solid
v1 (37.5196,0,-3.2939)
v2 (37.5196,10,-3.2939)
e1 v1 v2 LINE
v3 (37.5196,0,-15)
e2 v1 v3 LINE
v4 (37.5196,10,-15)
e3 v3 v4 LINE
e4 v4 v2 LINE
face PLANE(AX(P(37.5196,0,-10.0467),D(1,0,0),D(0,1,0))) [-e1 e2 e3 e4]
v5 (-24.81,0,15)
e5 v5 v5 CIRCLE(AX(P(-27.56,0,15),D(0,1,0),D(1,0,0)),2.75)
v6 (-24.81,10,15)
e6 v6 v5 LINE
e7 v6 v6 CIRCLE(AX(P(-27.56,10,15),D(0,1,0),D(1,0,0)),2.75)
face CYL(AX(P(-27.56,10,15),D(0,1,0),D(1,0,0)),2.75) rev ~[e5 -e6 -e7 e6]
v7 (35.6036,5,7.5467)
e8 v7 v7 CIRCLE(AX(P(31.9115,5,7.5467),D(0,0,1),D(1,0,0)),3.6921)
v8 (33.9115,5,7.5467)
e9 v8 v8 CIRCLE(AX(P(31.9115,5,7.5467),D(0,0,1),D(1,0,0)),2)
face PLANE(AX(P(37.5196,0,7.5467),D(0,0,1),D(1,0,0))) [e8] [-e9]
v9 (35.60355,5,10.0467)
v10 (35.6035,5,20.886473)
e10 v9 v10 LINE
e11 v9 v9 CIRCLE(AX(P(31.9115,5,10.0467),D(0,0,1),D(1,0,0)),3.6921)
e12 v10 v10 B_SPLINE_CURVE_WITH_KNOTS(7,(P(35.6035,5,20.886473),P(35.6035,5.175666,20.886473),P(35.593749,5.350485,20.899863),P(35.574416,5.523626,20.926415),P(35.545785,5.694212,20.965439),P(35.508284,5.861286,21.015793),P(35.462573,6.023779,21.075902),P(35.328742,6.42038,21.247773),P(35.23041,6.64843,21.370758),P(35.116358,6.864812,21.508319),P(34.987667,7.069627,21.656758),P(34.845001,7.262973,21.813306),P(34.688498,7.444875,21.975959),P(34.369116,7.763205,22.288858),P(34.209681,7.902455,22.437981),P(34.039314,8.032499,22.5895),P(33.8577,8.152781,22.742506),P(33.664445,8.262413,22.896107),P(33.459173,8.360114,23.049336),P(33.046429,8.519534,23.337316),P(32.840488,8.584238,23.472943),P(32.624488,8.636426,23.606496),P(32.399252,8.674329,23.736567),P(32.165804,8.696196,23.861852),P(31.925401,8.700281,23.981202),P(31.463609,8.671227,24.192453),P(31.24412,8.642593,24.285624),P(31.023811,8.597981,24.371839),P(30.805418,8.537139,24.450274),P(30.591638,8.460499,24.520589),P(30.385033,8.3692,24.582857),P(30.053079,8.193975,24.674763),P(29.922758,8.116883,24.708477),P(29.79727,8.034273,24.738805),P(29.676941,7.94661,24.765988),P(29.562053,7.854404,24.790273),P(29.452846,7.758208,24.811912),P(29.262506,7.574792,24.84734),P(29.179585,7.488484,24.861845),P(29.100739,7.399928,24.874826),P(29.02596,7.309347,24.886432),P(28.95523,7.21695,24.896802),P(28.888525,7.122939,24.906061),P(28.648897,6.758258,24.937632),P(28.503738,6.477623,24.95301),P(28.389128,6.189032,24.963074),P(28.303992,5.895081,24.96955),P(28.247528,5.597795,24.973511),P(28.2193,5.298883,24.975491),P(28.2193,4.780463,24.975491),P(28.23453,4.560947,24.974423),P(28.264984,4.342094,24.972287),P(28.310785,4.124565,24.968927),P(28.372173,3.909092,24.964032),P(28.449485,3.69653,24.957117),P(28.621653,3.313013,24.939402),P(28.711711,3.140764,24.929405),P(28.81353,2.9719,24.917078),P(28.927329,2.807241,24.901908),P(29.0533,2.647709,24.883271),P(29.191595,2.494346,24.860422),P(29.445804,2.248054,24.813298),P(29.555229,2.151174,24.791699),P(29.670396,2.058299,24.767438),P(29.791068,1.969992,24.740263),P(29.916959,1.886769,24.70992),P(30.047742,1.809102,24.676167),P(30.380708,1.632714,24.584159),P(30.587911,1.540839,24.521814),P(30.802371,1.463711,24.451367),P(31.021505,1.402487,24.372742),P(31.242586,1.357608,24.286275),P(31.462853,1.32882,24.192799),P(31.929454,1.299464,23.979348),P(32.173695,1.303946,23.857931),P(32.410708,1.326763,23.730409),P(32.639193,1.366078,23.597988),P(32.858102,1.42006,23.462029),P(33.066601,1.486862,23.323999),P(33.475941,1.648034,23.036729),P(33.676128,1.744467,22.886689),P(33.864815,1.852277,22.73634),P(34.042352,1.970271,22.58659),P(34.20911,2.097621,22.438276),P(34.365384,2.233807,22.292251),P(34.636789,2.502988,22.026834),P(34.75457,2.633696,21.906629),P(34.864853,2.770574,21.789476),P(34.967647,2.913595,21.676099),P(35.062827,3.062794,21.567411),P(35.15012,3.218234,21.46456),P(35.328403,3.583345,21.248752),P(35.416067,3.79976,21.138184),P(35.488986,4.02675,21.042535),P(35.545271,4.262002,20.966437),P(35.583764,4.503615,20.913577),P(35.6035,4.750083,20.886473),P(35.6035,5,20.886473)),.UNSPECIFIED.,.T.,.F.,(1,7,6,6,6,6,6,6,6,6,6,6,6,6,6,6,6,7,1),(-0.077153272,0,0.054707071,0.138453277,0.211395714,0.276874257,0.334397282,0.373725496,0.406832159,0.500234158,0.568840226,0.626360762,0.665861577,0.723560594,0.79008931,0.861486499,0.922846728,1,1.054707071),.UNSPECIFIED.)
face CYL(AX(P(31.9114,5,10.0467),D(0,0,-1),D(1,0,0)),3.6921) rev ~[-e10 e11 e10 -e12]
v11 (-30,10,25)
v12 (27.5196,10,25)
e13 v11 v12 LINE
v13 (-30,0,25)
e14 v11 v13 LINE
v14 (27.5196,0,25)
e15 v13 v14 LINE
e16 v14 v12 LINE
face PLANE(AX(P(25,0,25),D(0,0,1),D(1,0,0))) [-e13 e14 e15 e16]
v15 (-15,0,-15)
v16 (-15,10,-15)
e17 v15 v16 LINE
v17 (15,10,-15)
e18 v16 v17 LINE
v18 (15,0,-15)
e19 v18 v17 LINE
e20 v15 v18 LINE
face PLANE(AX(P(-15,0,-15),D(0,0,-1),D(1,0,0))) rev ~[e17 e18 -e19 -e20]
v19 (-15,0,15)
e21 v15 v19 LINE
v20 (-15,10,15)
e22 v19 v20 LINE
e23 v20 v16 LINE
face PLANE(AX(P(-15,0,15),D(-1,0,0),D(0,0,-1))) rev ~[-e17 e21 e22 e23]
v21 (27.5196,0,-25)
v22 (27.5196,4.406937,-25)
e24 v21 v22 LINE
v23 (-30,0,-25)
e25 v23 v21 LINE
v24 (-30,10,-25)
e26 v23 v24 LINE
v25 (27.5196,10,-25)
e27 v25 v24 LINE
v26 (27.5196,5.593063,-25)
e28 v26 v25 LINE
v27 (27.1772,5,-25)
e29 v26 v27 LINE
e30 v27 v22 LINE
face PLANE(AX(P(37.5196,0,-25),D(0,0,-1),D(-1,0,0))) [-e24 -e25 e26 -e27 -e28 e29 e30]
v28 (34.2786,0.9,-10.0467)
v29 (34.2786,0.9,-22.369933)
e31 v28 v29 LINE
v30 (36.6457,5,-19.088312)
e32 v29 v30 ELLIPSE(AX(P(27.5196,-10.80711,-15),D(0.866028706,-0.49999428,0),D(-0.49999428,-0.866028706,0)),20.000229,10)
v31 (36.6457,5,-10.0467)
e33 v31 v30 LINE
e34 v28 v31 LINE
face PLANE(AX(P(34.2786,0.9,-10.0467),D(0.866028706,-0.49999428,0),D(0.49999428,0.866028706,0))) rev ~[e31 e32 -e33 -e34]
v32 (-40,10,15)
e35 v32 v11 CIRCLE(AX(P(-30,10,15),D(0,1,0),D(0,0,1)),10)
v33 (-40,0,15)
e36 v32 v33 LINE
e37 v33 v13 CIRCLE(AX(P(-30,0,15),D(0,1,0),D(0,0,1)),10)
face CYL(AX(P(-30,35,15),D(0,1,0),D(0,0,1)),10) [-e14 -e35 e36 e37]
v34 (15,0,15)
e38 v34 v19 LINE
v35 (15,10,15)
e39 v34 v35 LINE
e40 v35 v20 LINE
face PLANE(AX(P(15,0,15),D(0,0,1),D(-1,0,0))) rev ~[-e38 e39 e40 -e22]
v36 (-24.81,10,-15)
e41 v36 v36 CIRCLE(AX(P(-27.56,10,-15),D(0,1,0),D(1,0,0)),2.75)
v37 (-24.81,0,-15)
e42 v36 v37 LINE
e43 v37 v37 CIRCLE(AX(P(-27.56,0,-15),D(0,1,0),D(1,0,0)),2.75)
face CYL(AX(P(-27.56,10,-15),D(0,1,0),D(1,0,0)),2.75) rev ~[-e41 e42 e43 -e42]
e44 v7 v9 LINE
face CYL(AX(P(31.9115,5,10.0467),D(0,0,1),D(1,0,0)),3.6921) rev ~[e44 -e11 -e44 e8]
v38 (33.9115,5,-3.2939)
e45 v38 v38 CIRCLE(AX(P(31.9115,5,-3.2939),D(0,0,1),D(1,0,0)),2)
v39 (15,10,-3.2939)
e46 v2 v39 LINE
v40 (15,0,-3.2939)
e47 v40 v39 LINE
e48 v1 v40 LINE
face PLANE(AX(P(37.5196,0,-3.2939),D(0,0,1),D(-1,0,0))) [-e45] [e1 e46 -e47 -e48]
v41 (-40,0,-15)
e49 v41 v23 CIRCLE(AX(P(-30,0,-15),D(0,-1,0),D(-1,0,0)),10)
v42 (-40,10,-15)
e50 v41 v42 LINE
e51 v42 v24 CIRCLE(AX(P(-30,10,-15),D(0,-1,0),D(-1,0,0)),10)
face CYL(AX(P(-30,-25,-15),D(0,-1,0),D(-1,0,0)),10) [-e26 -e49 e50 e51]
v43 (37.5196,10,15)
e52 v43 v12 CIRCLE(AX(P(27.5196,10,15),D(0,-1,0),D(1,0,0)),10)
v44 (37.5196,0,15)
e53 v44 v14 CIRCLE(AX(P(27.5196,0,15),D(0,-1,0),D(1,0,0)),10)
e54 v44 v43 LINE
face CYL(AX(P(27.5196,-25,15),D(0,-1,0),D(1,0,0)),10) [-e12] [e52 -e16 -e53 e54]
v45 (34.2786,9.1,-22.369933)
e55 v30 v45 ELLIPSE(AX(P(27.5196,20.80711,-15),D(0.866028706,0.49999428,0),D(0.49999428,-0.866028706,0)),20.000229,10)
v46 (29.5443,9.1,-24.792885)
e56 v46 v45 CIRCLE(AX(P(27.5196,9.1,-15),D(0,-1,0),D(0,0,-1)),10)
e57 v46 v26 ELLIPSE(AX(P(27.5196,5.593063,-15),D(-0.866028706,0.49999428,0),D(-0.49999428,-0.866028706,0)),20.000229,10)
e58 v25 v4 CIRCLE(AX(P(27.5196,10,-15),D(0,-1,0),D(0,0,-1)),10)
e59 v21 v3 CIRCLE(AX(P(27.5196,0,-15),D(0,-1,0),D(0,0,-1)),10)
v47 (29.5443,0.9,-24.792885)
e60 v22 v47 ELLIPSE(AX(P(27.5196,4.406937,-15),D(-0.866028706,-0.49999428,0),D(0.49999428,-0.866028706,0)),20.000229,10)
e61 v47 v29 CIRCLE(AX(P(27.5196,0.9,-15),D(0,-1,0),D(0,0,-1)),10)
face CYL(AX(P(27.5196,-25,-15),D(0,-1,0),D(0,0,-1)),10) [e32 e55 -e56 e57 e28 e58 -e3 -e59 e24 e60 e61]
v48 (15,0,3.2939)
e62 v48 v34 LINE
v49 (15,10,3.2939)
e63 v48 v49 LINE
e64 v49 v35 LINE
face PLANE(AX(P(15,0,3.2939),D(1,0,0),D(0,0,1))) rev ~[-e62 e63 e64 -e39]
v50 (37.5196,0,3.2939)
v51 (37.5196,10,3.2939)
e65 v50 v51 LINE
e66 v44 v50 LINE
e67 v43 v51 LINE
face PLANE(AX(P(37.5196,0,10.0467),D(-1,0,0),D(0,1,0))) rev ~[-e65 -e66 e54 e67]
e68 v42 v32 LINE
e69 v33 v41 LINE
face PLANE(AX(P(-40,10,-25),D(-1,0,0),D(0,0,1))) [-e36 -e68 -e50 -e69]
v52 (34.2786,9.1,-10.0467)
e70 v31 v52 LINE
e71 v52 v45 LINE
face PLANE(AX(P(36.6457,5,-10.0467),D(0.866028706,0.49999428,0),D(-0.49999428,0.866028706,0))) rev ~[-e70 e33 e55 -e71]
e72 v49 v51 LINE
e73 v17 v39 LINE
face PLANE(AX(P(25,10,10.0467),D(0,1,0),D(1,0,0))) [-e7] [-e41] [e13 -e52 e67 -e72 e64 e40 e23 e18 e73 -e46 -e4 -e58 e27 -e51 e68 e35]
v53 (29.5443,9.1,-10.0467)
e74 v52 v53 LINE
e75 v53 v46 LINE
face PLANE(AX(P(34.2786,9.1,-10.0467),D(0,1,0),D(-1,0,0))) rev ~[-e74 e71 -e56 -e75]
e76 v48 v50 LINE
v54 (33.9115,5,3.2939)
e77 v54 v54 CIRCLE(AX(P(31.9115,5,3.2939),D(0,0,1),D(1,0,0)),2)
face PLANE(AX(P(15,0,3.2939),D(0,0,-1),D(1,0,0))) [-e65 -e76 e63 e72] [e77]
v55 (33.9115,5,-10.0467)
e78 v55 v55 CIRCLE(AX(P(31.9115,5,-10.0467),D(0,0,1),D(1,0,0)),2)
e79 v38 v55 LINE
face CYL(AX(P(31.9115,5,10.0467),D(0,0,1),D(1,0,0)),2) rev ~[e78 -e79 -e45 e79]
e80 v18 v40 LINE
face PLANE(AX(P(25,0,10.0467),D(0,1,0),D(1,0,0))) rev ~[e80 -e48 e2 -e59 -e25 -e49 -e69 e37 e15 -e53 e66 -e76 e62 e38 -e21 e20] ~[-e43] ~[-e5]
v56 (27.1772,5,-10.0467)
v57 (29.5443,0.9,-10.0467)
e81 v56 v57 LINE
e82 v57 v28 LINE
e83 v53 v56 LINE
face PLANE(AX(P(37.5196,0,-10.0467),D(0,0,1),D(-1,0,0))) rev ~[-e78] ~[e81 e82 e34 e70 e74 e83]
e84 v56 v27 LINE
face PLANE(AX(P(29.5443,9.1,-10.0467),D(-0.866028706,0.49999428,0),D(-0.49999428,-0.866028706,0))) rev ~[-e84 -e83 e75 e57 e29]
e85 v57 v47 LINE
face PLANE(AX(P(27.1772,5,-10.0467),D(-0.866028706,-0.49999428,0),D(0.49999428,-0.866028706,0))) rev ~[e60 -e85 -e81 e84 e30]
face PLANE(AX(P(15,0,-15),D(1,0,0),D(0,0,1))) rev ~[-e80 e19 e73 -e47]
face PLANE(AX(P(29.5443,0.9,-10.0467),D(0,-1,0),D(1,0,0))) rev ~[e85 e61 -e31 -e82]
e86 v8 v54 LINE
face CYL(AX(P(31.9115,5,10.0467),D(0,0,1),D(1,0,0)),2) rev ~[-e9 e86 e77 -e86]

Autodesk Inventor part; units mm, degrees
ref_plane "YZ Plane" through (0, 0, 0) normal (1, 0, 0) x (0, 1, 0)
ref_plane "XZ Plane" through (0, 0, 0) normal (0, 1, 0) x (-1, 0, 0)
ref_plane "XY Plane" through (0, 0, 0) normal (0, 0, 1) x (1, 0, 0)
sketch "Sketch1" plane through (0, 0, 0) normal (0, 1, 0) x (-1, 0, 0)
  line L0 (-15, 15) -> (15, 15)
  line L1 (15, 15) -> (15, -15)
  line L2 (15, -15) -> (-15, -15)
  line L3 (-15, 15) -> (15, -15) construction
  line L4 (15, 15) -> (-15, -15) construction
  line L5 (25, 25) -> (-25, 25)
  line L6 (-25.5008, -25) -> (24.4992, -25)
  line L7 (25, 25) -> (59.45, 25)
  line L8 (59.45, 25) -> (59.45, -25)
  line L9 (59.45, -25) -> (24.4992, -25)
  line L10 (-37.5196, -10.0467) -> (-25.5008, -10.0467)
  line L11 (-25, 10.0467) -> (-37.5196, 10.0467)
  line L12 (-37.5196, -3.2939) -> (-15, -3.2939)
  line L13 (-15, 3.2939) -> (-37.5196, 3.2939)
  line L14 (-37.5196, 10.0467) -> (-37.5196, 3.2939)
  line L15 (-37.5196, -3.2939) -> (-37.5196, -10.0467)
  line L16 (-25, 25) -> (-25, 10.0467)
  line L17 (-15, -15) -> (-15, -3.2939)
  line L18 (-15, 3.2939) -> (-15, 15)
  line L19 (-25.5008, -10.0467) -> (-25.5008, -25)
  point P0 (0, 0)
  point P1 (-30.7833, 0)
  point P2 (25, -25)
  dimension "d0" = 30
  dimension "d1" = 30
  dimension "d2" = 10
  dimension "d4" = 44.45
extrude "Extrusion1" add sketch "Sketch1" along normal blind 10
sketch "Sketch2" plane through (0, 0, 0) normal (0, -1, 0) x (1, 0, 0)
  line L0 (15, 15) -> (-15, 15) projected
  line L1 (15, 3.2939) -> (15, 15) projected
  line L2 (37.5196, 3.2939) -> (15, 3.2939) projected
  line L3 (37.5196, 10.0467) -> (37.5196, 3.2939) projected
  line L4 (25, 10.0467) -> (37.5196, 10.0467) projected
  line L5 (25, 25) -> (25, 10.0467) projected
  line L6 (-59.45, 25) -> (25, 25) projected
  line L7 (-59.45, -25) -> (-59.45, 25) projected
  line L8 (25.5008, -25) -> (-59.45, -25) projected
  line L9 (25.5008, -10.0467) -> (25.5008, -25) projected
  line L10 (37.5196, -10.0467) -> (25.5008, -10.0467) projected
  line L11 (37.5196, -3.2939) -> (37.5196, -10.0467) projected
  line L12 (15, -3.2939) -> (37.5196, -3.2939) projected
  line L13 (15, -15) -> (15, -3.2939) projected
  line L14 (-15, -15) -> (15, -15) projected
  line L15 (-15, 15) -> (-15, -15) projected
  line L16 (-49.725, -25) -> (-24.725, -25)
  line L17 (-24.725, -25) -> (-24.725, 25)
  line L18 (-24.725, 25) -> (-49.725, 25)
  line L19 (-49.725, 25) -> (-49.725, -25)
  line L20 (-49.725, -25) -> (-24.725, 25) construction
  line L21 (-24.725, -25) -> (-49.725, 25) construction
  line L22 (-59.45, 25) -> (25, 25) projected
  line L23 (-15, 25) -> (-15, -25)
  line L24 (25.5008, -25) -> (-59.45, -25) projected
  line L25 (-59.45, 25) -> (-49.725, 25)
  line L26 (-59.45, 25) -> (25, 25) projected
  line L27 (-24.725, 25) -> (-15, 25)
  line L28 (-59.45, 21.5922) -> (-49.725, 21.5922)
  line L29 (-24.725, 21.5922) -> (-15, 21.5922)
  line L30 (-15, 15) -> (-15, -15) projected
  point P0 (0, 0)
  point P1 (-37.225, 0)
  point P2 (-15, -25)
  dimension "d7" = 25
extrude "Extrusion2" add sketch "Sketch2" along normal blind 25 contours L15 L23 L8 L17 L29 | L29 L17 L6 L23 | L8 L7 L28 L19 | L19 L28 L7 L6
sketch "Sketch3" plane through (-24.725, 0, -25) normal (-1, 0, 0) x (0, 0, 1)
  line L0 (0, 0) -> (50, 0) construction
  line L1 (0, 0) -> (0, -25) construction
  line L2 (50, -25) -> (0, -25) construction
  line L3 (50, 0) -> (50, -25) construction
  line L4 (0, -12.5) -> (50, -12.5) construction
  line L5 (50, 0) -> (50, -25) construction
  line L6 (15, -12.5) -> (35, -12.5) construction
  line L7 (15, -15.2) -> (35, -15.2) construction
  line L8 (35, -9.8) -> (15, -9.8) construction
  arc A0 (15, -9.8) -> (15, -15.2) centre (15, -12.5) ccw construction
  arc A1 (35, -15.2) -> (35, -9.8) centre (35, -12.5) ccw
  circle A2 centre (35, -12.5) radius 2.7
  circle A3 centre (15, -12.5) radius 2.7
  point P0 (25, 0)
  point P1 (25, -12.5)
  point P2 (35, -9.8)
  dimension "d10" = 20
  dimension "d11" = 2.7
extrude "Extrusion3" cut sketch "Sketch3" along normal through all both and the other way through all
sketch "Sketch4" plane through (37.5196, 0, 10.0467) normal (0, 0, 1) x (1, 0, 0)
  line L0 (-12.5196, 0) -> (0, 0) projected
  line L1 (0, 0) -> (0, 10) projected
  line L2 (-12.5196, 10) -> (0, 10) projected
  circle A0 centre (-5.6081, 5) radius 2
  line L3 (-12.5196, 0) -> (-12.5196, 10) projected
  point P0 (-37.5196, 0)
  dimension "d15" = 4
extrude "Extrusion4" cut sketch "Sketch4" against normal through all contours A0
sketch "Sketch5" plane through (37.5196, 0, 10.0467) normal (0, 0, 1) x (1, 0, 0)
  circle A0 centre (-5.6081, 5) radius 2 projected
  circle A1 centre (-5.6081, 5) radius 3.6921
  point P0 (-37.5196, 0)
  point P1 (-9.307, 3.7757)
  point P2 (-9.307, 6.2243)
extrude "Extrusion5" cut sketch "Sketch5" along normal mid plane 5 contours A0 | A1
sketch "Sketch6" plane through (0, 10, 0) normal (0, 1, 0) x (1, 0, 0)
  line L0 (25, -25) -> (25, -10.0467) projected
  line L1 (25, -10.0467) -> (37.5196, -10.0467) projected
  line L2 (37.5196, -10.0467) -> (37.5196, -3.2939) projected
  line L3 (37.5196, -3.2939) -> (15, -3.2939) projected
  line L4 (15, -3.2939) -> (15, -15) projected
  line L5 (15, -15) -> (-15, -15) projected
  line L6 (-15, -15) -> (-15, 15) projected
  line L7 (-15, 15) -> (15, 15) projected
  line L8 (15, 15) -> (15, 3.2939) projected
  line L9 (15, 3.2939) -> (37.5196, 3.2939) projected
  line L10 (37.5196, 3.2939) -> (37.5196, 10.0467) projected
  line L11 (37.5196, 10.0467) -> (25.5008, 10.0467) projected
  line L12 (25.5008, 10.0467) -> (25.5008, 25) projected
  line L13 (25.5008, 25) -> (-59.45, 25) projected
  line L14 (-59.45, 25) -> (-59.45, -25) projected
  line L15 (-59.45, -25) -> (25, -25) projected
  line L16 (-59.45, -25) -> (20, -25) projected
  line L17 (-25, -25) -> (-25, 25)
  point P0 (0, 0)
  dimension "d20" = 10
  dimension "d21" = 10
extrude "Extrusion6" cut sketch "Sketch6" against normal through all contours L15 L14 L13 L17
sketch "Sketch7" plane through (-24.725, 0, -25) normal (-1, 0, 0) x (0, 0, 1)
  circle A0 centre (35, -12.5) radius 2.7 projected
  circle A1 centre (15, -12.5) radius 2.7 projected
  line L0 (50, -25) -> (0, -25) projected
  line L1 (50, 0) -> (50, -25) projected
  line L2 (0, 0) -> (50, 0) projected
  line L3 (0, 0) -> (0, -25) projected
  point P0 (25, 0)
extrude "Extrusion7" cut sketch "Sketch7" against normal through all
sketch "Sketch8" plane through (-25, 10, -25) normal (-1, 0, 0) x (0, 0, 1)
  line L0 (50, -10) -> (0, -10) projected
  line L1 (50, 0) -> (50, -10) projected
  line L2 (0, 0) -> (50, 0) projected
  line L3 (0, -10) -> (0, 0) projected
  point P0 (25, -10)
extrude "Extrusion8" add sketch "Sketch8" along normal blind 15
sketch "Sketch9" plane through (37.5196, 0, -10.0467) normal (0, 0, -1) x (-1, 0, 0)
  circle A0 centre (5.6081, 5) radius 2 projected
  line L0 (0, 0) -> (12.0187, 0) projected
  line L1 (12.0187, 0) -> (12.0187, 10) projected
  line L2 (0, 10) -> (12.0187, 10) projected
  line L3 (0, 0) -> (0, 10) projected
  circle A1 centre (5.6081, 5) radius 3.6921 projected
  line L4 (7.9753, 9.1) -> (10.3424, 5)
  line L5 (10.3424, 5) -> (7.9753, 0.9)
  line L6 (7.9753, 0.9) -> (3.241, 0.9)
  line L7 (3.241, 0.9) -> (0.8739, 5)
  line L8 (0.8739, 5) -> (3.241, 9.1)
  line L9 (3.241, 9.1) -> (7.9753, 9.1)
  point P0 (37.5196, 0)
  point P1 (8.8062, 2.3392)
  point P2 (8.8062, 7.6608)
  point P3 (8.8062, 6.8449)
  point P4 (8.8062, 3.1551)
  dimension "d28" = 8.2
extrude "Extrusion9" add sketch "Sketch9" along normal up to surface (14.9533 mm away) contours L3 L2 L1 L0
sketch "Sketch10" plane through (25, 0, 10.0467) normal (0, 0, 1) x (1, 0, 0)
  circle A0 centre (6.9114, 5) radius 3.6921 projected
  line L0 (0, 0) -> (12.5196, 0) projected
  line L1 (12.5196, 0) -> (12.5196, 10) projected
  line L2 (0, 10) -> (12.5196, 10) projected
  line L3 (0, 0) -> (0, 10) projected
  point P0 (-25, 0)
extrude "Extrusion10" add sketch "Sketch10" along normal up to surface (14.9533 mm away)
sketch "Sketch11" plane through (0, 10, 0) normal (0, 1, 0) x (1, 0, 0)
  line L0 (-40.28, -55.2921) -> (-40.28, 159.5519) projected
  line L1 (-15.12, -75.3901) -> (-15.12, 179.6099) projected
  line L2 (-40, -25) -> (37.5196, -25) projected
  line L3 (37.5196, -3.2939) -> (37.5196, -25) projected
  line L4 (37.5196, -3.2939) -> (15, -3.2939) projected
  line L5 (15, -3.2939) -> (15, -15) projected
  line L6 (15, -15) -> (-15, -15) projected
  line L7 (-15, -15) -> (-15, 15) projected
  line L8 (-15, 15) -> (15, 15) projected
  line L9 (15, 15) -> (15, 3.2939) projected
  line L10 (15, 3.2939) -> (37.5196, 3.2939) projected
  line L11 (37.5196, 3.2939) -> (37.5196, 25) projected
  line L12 (37.5196, 25) -> (-40, 25) projected
  line L13 (-40, -25) -> (-40, 25) projected
  line L14 (-15.12, 25) -> (-40, 25) construction
  circle A0 centre (-27.56, 15) radius 2.75
  circle A1 centre (-27.56, -15) radius 2.75
  point P0 (0, 0)
  dimension "d33" = 5.5
extrude "Extrusion11" cut sketch "Sketch11" against normal through all contours A0 | A1
fillet "Fillet2" radius 10 4 edges at (37.5196, 5, 25) (37.5196, 5, -25) (-40, 5, 25) (-40, 5, -25)
properties part number "estopMountV2"
